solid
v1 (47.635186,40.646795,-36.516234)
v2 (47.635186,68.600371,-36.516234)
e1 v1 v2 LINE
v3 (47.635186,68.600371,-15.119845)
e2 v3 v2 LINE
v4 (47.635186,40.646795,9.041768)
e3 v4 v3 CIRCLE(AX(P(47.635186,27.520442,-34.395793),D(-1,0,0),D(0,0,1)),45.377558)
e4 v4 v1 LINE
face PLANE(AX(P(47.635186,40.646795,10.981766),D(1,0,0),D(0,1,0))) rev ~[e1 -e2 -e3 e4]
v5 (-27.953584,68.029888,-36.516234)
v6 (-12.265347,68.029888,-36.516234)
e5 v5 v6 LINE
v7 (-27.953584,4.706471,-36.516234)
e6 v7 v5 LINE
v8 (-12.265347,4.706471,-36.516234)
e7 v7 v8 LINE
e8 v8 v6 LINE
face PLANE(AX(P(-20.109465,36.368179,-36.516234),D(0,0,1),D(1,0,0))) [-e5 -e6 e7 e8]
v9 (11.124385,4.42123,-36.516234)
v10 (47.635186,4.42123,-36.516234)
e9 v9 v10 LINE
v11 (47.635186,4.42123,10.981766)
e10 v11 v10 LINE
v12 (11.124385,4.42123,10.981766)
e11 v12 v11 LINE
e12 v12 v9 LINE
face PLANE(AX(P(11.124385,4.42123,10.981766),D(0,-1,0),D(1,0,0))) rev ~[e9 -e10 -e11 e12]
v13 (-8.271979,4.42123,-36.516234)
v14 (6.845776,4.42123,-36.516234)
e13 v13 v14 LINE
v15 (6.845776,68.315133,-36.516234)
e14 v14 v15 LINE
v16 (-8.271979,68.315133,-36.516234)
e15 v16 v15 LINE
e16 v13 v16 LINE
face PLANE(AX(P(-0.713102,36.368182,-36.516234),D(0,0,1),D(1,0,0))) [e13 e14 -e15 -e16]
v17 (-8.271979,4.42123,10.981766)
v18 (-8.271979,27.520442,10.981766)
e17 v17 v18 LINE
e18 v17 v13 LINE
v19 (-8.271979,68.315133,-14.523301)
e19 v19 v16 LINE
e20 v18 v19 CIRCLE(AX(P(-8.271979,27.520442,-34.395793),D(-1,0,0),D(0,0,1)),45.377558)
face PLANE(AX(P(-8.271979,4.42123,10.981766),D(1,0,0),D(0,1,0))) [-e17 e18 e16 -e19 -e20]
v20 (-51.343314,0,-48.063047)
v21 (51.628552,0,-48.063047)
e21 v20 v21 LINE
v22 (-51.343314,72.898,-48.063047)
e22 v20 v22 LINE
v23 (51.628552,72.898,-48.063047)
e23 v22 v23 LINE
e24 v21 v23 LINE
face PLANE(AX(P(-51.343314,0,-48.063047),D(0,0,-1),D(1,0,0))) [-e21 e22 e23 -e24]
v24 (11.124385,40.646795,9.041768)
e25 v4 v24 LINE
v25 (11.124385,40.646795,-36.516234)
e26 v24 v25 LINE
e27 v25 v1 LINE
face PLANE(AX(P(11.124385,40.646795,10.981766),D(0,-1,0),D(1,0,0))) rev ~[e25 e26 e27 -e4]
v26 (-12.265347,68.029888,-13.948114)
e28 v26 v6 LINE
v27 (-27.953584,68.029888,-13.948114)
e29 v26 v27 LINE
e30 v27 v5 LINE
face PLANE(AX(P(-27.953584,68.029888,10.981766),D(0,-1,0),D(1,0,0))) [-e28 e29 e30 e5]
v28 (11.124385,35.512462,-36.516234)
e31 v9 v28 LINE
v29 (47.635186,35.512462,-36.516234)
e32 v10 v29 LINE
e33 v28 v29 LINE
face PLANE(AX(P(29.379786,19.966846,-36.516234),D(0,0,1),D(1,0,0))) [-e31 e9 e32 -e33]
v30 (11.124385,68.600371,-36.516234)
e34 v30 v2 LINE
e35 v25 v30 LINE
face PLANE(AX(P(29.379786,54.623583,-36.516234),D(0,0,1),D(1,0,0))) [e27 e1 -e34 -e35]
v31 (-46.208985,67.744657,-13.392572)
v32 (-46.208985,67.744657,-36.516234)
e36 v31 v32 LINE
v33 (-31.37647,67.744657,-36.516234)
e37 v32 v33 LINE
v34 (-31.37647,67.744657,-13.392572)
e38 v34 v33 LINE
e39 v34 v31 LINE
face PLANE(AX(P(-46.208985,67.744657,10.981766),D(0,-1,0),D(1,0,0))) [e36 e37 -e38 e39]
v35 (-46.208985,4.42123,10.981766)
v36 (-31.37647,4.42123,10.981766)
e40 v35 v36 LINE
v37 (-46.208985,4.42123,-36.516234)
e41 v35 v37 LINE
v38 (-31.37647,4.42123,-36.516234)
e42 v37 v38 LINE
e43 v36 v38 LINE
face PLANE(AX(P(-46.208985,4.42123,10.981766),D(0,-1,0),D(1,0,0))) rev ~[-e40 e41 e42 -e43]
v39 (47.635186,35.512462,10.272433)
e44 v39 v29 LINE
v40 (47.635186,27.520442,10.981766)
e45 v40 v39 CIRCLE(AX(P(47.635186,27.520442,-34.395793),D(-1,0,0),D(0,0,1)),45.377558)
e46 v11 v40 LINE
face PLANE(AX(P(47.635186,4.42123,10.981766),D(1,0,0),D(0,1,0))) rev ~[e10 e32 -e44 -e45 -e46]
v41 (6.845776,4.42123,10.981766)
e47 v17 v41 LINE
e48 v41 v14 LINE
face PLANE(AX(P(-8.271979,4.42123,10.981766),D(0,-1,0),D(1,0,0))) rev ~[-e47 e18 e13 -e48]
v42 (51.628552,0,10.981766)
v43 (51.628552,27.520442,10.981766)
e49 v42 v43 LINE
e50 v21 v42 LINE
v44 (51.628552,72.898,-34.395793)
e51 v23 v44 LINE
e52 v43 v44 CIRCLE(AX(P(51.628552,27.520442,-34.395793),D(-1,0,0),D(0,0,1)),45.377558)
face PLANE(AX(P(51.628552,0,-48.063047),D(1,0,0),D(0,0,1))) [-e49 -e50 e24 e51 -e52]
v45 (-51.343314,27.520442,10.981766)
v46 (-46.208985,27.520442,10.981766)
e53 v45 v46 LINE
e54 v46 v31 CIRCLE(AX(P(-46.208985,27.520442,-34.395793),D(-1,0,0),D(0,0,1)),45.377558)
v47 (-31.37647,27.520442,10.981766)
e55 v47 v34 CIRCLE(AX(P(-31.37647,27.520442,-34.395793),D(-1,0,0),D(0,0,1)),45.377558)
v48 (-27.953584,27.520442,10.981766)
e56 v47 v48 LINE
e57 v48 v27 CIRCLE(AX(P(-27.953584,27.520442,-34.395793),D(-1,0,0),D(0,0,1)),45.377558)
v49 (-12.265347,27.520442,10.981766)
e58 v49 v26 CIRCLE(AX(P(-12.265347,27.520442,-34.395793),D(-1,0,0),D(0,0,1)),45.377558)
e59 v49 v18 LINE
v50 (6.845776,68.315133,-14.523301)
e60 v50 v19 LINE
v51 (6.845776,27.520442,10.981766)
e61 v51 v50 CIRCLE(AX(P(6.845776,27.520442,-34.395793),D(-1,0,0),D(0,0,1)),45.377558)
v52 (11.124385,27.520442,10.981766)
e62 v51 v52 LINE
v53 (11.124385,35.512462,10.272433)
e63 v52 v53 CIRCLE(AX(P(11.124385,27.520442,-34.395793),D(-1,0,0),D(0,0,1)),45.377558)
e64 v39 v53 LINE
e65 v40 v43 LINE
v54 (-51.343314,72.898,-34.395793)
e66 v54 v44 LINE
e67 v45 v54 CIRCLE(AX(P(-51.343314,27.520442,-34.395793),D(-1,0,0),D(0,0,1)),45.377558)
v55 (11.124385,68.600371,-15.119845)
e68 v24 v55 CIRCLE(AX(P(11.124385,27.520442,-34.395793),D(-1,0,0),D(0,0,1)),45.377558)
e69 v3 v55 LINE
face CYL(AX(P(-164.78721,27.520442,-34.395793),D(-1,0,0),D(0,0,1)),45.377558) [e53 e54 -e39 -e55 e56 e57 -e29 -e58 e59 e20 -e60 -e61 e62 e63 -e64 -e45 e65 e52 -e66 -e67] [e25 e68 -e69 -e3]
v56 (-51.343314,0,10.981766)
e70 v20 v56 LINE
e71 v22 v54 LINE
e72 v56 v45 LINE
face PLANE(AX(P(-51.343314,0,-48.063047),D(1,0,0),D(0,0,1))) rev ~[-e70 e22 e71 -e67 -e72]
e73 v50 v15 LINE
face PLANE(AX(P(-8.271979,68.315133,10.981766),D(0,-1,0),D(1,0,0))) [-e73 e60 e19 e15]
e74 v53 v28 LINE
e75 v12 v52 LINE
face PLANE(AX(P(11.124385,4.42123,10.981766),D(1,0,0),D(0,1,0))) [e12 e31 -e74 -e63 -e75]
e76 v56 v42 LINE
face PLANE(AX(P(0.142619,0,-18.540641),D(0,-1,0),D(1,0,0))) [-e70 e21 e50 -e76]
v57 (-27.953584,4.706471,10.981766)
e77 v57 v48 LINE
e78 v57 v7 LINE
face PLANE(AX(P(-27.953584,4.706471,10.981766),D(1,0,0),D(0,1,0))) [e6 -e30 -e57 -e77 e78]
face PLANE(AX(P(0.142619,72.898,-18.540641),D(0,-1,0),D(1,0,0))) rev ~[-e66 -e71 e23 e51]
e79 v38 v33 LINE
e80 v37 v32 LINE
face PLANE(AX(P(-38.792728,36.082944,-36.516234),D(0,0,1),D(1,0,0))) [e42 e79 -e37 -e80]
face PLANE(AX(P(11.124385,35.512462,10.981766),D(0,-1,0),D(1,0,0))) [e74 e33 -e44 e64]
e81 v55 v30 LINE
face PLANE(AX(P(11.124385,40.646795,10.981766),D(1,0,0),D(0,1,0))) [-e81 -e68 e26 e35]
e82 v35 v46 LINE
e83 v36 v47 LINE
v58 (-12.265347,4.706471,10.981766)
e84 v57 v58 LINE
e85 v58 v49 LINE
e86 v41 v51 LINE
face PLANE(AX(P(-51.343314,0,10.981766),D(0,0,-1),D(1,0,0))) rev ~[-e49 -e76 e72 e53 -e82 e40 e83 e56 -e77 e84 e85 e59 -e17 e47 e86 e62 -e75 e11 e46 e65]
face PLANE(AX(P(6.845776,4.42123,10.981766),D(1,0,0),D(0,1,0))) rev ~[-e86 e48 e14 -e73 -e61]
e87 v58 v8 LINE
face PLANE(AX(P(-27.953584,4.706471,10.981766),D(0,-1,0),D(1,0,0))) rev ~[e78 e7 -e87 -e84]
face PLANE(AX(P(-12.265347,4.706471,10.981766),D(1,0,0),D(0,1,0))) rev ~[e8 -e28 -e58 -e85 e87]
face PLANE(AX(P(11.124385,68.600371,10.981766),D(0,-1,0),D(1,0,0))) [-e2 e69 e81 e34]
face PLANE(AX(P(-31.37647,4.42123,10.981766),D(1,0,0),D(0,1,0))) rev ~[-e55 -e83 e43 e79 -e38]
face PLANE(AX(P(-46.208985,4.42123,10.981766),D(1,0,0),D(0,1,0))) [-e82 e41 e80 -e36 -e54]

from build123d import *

# Parameters (mm, degrees)
F0_W        = 102.9718667269
F0_H        = 59.044812806
F1_DEPTH    = 72.898
F2_W        = 14.8325152695
F2_H        = 63.3234274574
F2_W_2      = 15.6882368028
F2_H_2      = 63.3234172128
F2_W_3      = 15.1177551597
F2_H_3      = 63.8939035125
F2_W_4      = 36.5108018741
F2_H_4      = 27.9535762966
F2_H_5      = 31.0912323184
F4_DEPTH    = 47.498
F5_T1_DEPTH = 329.8596573187


# Not quite as in the source:
# - a fillet or chamfer that OpenCascade refuses, or shapes differently, is made with other operations: its cross-section is extruded or revolved along the edge and cut away or added


with BuildPart() as f1:
    # F0 (on Front) → F1 (new body)
    with BuildSketch(Plane.XZ):
        with Locations((0.1426190138, -18.5406408273)):
            Rectangle(F0_W, F0_H)
    extrude(amount=-F1_DEPTH)

    # F2 (on face) → F4 (cut)
    with BuildSketch(Plane.XY.offset(10.9817655757)):
        with Locations((-38.7927275151, 36.0829436686)):
            Rectangle(F2_W, F2_H)
        with Locations((-20.1094653457, 36.3681793679)):
            Rectangle(F2_W_2, F2_H_2)
        with Locations((-0.7131015882, 36.3681816962)):
            Rectangle(F2_W_3, F2_H_3)
        with Locations((29.3797855265, 54.6235833317)):
            Rectangle(F2_W_4, F2_H_4)
        with Locations((29.3797855265, 19.9668460991)):
            Rectangle(F2_W_4, F2_H_5)
    extrude(amount=-F4_DEPTH, mode=Mode.SUBTRACT)

    # F5: fillet of radius 45.3775581184 on 1 edges, made by hand

    # F5_s2 → F5_t1 (cut)
    with BuildSketch(Plane.YZ.offset(-164.7872096456)):
        with BuildLine():
            ThreePointArc((27.5204418816, 10.9817655757), (59.6072209408, -2.3090134835), (72.898, -34.3957925427))
            Line((72.898, -34.3957925427), (72.898, 10.9817655757))
            Line((72.898, 10.9817655757), (27.5204418816, 10.9817655757))
        make_face()
    extrude(amount=F5_T1_DEPTH, mode=Mode.SUBTRACT)


solid = f1.part
